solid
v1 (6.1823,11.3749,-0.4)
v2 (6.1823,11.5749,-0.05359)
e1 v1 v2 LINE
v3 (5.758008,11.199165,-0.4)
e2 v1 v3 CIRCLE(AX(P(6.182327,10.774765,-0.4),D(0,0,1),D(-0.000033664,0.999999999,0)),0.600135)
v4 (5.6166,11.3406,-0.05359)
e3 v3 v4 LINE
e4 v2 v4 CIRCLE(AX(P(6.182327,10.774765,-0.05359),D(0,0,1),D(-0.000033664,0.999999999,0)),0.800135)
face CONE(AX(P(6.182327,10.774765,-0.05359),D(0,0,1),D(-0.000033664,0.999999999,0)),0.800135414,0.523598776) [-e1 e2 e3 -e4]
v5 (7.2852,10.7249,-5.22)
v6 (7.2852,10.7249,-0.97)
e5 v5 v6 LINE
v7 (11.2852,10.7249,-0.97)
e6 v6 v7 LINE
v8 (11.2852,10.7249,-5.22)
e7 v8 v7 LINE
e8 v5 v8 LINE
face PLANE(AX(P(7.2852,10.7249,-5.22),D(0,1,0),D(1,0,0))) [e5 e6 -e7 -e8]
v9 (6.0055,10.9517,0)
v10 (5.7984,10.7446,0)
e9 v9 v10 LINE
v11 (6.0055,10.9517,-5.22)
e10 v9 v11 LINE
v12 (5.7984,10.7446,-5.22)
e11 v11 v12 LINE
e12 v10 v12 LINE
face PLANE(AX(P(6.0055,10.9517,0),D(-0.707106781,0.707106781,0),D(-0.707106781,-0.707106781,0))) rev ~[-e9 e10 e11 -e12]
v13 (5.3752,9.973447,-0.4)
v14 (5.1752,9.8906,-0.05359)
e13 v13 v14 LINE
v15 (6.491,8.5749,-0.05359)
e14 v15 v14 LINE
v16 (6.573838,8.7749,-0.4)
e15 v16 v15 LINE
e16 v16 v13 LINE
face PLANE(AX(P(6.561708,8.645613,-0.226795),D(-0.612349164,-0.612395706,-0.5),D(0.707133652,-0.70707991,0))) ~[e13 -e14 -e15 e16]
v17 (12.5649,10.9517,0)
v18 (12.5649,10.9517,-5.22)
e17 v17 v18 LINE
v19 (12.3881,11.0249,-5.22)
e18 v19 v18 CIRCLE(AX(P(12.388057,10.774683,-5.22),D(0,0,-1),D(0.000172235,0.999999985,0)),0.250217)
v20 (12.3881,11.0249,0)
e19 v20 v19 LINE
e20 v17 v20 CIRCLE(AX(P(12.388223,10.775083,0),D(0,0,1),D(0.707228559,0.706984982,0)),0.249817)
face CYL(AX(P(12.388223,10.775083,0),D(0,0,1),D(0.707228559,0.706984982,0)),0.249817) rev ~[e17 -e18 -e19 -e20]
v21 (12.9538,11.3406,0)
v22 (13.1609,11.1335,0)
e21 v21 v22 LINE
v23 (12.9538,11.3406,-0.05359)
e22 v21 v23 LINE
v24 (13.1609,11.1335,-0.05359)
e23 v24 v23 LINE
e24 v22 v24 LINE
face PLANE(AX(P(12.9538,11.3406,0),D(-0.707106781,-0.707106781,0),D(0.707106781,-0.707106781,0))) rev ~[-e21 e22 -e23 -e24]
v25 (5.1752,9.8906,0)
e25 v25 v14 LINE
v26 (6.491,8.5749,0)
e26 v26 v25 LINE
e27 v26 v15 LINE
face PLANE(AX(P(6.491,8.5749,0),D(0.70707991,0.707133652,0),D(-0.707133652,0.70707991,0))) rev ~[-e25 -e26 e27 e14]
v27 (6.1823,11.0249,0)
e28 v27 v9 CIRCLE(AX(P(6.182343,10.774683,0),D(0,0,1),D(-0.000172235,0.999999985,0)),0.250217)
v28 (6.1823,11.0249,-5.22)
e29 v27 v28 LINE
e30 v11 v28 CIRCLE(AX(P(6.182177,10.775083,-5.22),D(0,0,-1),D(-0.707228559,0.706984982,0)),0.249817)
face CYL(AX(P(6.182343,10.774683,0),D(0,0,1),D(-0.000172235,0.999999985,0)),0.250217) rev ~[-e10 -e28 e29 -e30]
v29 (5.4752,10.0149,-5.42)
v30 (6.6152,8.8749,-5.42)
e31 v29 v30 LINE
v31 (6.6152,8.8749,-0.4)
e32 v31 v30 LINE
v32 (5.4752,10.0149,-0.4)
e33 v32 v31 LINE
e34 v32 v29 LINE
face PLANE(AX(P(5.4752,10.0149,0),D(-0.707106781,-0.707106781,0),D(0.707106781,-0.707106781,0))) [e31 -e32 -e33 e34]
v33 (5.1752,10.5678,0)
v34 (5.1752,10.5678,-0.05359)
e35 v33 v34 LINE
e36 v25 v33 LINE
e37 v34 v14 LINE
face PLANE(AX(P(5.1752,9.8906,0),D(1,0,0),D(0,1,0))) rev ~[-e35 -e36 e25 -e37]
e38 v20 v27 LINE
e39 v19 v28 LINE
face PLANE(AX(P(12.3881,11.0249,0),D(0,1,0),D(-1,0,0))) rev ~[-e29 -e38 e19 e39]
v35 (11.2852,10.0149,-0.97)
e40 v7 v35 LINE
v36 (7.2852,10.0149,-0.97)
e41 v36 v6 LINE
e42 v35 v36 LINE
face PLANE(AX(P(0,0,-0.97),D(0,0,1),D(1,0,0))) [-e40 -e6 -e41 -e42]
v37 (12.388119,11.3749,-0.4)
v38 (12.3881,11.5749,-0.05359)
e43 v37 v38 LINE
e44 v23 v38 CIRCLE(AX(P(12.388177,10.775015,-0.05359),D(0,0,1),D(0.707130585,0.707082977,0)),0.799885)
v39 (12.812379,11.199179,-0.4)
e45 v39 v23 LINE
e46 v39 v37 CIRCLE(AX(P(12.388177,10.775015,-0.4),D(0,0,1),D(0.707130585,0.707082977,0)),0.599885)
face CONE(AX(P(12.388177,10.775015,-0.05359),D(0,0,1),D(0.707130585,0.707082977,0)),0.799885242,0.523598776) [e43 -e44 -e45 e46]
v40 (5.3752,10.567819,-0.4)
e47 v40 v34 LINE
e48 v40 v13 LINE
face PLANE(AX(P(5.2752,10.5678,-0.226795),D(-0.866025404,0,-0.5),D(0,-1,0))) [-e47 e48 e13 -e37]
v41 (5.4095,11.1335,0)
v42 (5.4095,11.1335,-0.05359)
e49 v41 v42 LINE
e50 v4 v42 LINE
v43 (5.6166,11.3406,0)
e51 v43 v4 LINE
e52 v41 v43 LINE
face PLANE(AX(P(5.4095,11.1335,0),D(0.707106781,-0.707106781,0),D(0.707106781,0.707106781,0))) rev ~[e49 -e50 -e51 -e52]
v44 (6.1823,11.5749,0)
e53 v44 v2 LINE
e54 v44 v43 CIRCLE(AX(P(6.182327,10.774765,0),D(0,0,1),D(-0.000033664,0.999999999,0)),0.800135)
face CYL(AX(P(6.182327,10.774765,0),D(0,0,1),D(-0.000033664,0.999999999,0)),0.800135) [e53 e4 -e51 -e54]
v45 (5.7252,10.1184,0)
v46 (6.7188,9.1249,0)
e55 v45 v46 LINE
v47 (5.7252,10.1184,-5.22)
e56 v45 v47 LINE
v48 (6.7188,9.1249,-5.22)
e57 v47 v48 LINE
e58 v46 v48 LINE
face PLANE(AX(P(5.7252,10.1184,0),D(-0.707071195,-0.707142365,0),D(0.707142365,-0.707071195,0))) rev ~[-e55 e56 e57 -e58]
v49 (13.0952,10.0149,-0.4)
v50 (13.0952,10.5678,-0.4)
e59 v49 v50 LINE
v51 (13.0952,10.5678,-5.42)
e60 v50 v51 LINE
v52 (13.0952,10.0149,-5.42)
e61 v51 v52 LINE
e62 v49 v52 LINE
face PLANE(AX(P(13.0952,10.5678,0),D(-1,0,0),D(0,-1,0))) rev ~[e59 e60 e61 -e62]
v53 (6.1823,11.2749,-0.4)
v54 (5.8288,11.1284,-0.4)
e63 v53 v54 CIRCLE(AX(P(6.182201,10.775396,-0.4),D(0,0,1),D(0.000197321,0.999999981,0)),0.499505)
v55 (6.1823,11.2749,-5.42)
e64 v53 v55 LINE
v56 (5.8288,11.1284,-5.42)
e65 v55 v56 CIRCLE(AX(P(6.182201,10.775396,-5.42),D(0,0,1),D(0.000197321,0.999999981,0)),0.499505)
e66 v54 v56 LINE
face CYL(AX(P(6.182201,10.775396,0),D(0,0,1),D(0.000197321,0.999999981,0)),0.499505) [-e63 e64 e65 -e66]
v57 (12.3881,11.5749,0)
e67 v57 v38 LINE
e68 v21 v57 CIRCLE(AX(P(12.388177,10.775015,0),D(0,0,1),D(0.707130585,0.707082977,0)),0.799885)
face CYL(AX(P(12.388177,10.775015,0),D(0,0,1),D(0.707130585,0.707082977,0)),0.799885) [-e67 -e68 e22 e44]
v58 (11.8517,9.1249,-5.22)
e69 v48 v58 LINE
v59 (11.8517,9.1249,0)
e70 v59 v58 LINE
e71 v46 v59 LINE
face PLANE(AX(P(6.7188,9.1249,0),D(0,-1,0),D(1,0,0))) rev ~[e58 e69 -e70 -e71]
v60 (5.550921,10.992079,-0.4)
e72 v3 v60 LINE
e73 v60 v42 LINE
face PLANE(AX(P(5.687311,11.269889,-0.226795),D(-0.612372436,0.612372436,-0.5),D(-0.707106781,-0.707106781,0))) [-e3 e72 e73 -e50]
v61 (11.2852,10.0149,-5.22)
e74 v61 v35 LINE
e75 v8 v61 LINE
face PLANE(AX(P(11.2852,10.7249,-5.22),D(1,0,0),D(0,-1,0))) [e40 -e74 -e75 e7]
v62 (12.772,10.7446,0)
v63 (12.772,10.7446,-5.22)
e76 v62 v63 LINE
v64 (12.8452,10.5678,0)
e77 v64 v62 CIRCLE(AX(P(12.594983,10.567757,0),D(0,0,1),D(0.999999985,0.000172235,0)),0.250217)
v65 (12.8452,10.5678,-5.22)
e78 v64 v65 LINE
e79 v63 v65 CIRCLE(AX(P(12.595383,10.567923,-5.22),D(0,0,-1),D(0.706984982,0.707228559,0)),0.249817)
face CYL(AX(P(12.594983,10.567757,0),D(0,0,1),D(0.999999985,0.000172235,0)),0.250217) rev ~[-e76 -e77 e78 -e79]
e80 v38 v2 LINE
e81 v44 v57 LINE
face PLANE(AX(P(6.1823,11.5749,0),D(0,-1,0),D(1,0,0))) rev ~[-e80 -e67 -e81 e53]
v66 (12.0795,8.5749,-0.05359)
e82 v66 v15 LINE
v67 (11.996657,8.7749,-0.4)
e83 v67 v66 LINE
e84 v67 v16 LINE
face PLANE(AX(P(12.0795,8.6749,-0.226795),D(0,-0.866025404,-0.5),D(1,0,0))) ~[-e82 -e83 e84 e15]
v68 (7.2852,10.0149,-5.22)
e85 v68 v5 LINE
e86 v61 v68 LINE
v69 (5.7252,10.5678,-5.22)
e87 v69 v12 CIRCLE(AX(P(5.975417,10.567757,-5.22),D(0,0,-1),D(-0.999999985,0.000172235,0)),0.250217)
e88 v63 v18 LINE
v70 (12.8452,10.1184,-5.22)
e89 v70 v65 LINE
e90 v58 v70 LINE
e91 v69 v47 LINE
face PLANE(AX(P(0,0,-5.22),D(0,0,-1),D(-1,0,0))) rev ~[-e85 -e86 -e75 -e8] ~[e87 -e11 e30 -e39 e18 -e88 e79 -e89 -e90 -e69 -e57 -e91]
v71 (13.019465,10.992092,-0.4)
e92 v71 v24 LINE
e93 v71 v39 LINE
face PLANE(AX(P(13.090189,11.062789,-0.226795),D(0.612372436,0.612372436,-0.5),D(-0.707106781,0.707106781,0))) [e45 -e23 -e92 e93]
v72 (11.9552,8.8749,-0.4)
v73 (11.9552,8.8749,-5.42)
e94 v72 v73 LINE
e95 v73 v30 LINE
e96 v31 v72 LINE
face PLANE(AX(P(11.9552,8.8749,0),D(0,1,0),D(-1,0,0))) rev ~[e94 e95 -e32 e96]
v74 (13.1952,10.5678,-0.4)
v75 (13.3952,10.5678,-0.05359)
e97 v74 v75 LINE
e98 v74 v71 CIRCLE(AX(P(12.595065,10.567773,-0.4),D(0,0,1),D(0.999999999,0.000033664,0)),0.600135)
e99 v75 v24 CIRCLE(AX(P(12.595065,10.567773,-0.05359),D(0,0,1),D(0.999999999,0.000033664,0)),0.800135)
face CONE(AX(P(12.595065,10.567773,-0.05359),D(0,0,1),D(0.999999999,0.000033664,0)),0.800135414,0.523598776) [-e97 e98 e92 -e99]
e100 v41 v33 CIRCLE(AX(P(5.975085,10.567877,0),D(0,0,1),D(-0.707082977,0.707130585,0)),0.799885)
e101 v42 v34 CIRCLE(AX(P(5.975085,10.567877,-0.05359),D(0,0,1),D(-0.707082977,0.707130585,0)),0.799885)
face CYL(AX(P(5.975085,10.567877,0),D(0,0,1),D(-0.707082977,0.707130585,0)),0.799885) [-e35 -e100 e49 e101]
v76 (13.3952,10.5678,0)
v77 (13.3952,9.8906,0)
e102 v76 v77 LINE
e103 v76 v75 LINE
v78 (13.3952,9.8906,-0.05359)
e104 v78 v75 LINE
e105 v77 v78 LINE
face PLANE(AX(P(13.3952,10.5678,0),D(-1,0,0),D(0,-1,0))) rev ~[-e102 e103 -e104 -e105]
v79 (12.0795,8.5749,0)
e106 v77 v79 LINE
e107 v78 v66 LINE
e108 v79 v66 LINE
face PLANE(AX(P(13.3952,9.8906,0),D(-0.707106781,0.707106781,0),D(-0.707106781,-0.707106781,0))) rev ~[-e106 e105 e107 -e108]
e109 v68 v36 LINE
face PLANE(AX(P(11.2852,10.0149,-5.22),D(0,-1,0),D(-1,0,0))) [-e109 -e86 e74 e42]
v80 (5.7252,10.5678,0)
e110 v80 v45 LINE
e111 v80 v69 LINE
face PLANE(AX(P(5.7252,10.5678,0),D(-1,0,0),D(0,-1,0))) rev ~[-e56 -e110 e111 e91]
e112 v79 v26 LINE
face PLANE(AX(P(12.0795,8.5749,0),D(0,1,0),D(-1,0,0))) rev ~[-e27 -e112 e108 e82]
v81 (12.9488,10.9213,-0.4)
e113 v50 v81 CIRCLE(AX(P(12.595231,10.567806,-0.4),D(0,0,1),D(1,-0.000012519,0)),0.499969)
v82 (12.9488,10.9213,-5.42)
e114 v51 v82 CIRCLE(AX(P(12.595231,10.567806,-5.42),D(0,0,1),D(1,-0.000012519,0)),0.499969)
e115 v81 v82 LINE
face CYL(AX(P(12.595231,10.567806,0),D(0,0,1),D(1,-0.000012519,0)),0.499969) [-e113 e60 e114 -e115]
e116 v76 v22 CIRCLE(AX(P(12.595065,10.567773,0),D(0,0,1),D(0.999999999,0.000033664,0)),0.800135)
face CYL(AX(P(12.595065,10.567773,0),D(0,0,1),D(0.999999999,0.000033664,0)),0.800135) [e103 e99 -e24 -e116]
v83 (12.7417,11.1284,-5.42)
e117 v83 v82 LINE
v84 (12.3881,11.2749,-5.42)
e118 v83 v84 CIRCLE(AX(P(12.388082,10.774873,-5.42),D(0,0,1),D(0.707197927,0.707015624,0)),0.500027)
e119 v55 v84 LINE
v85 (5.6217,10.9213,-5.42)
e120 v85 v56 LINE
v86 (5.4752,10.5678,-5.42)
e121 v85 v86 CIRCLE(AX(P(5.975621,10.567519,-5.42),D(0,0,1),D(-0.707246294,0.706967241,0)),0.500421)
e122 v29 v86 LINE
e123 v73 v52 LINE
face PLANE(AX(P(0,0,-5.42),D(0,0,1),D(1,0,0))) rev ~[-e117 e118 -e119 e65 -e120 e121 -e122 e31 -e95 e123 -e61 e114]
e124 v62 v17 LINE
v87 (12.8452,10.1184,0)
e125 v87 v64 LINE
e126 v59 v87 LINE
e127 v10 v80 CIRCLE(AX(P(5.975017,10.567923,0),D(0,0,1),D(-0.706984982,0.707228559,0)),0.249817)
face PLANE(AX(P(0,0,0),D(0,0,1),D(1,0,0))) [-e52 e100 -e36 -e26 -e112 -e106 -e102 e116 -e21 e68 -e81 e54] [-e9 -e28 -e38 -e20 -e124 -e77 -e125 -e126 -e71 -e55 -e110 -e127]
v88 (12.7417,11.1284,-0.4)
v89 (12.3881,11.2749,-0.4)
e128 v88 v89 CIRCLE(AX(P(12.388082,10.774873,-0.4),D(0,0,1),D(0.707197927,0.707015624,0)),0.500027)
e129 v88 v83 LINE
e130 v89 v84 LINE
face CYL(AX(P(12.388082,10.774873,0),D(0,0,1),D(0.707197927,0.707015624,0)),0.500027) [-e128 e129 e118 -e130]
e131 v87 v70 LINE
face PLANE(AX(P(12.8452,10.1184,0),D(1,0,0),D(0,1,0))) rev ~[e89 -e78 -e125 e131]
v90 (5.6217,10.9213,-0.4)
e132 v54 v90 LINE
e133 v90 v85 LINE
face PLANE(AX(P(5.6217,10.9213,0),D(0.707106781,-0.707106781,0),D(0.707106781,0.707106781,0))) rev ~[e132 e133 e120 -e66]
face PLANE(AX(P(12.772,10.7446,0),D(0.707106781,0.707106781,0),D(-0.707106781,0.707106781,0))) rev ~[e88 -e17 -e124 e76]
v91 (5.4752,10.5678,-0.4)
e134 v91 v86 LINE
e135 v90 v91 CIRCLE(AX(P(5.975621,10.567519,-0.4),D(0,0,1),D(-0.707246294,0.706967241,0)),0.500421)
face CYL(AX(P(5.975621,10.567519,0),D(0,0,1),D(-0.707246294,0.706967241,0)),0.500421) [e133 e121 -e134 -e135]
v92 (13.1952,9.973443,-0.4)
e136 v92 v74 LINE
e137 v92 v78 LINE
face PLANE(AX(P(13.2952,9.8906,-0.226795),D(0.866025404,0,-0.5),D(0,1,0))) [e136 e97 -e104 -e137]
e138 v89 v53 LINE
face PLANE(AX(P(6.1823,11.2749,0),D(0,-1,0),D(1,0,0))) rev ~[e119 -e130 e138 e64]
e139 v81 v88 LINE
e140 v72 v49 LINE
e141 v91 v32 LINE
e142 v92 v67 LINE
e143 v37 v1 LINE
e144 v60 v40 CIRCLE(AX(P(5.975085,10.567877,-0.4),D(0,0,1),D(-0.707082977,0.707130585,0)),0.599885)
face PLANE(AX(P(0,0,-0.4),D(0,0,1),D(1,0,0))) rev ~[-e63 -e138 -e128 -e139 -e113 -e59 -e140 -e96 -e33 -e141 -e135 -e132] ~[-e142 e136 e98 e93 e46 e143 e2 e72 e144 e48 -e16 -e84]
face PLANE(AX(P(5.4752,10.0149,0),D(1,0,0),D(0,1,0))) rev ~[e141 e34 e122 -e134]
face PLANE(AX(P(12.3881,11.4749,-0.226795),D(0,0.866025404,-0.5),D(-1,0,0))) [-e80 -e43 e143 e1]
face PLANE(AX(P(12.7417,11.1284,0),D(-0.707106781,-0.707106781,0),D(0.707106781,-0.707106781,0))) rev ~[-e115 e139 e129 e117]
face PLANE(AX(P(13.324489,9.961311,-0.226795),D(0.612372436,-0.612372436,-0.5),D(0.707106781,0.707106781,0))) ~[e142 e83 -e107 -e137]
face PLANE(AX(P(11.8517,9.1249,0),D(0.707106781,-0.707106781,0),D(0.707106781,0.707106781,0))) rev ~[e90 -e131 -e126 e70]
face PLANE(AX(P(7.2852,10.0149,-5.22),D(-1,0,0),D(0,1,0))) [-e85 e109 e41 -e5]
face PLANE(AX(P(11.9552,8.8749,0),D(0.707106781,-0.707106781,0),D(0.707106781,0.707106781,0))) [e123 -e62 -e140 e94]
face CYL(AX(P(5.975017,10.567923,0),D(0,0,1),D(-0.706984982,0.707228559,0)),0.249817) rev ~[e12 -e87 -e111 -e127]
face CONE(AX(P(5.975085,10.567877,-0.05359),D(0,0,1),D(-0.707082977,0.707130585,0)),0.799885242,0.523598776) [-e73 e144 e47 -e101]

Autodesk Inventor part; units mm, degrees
ref_plane "YZ Plane" through (0, 0, 0) normal (1, 0, 0) x (0, 1, 0)
ref_plane "XZ Plane" through (0, 0, 0) normal (0, 1, 0) x (-1, 0, 0)
sketch "Sketch1" plane through (0, 0, 0) normal (0, 0, 1) x (1, 0, 0)
  line L0 (6.1823, 11.2749) -> (12.3881, 11.2749)
  line L1 (13.0952, 10.5678) -> (13.0952, 10.0149)
  line L2 (11.9552, 8.8749) -> (6.6152, 8.8749)
  line L3 (5.4752, 10.0149) -> (5.4752, 10.5678)
  line L4 (5.4752, 10.0149) -> (6.6152, 8.8749)
  line L5 (11.9552, 8.8749) -> (13.0952, 10.0149)
  line L6 (5.6217, 10.9213) -> (5.8288, 11.1284)
  line L7 (12.7417, 11.1284) -> (12.9488, 10.9213)
  arc A0 (6.1823, 11.2749) -> (5.8288, 11.1284) centre (6.1823, 10.7749) ccw
  arc A1 (5.6217, 10.9213) -> (5.4752, 10.5678) centre (5.9752, 10.5678) ccw
  arc A2 (12.7417, 11.1284) -> (12.3881, 11.2749) centre (12.3881, 10.7749) ccw
  arc A3 (13.0952, 10.5678) -> (12.9488, 10.9213) centre (12.5952, 10.5678) ccw
  line L8 (12.3881, 11.0249) -> (6.1823, 11.0249)
  arc A4 (6.1823, 11.0249) -> (6.0055, 10.9517) centre (6.1823, 10.7749) ccw
  line L9 (6.0055, 10.9517) -> (5.7984, 10.7446)
  arc A5 (5.7984, 10.7446) -> (5.7252, 10.5678) centre (5.9752, 10.5678) ccw
  line L10 (5.7252, 10.5678) -> (5.7252, 10.1184)
  line L11 (5.7252, 10.1184) -> (6.7188, 9.1249)
  line L12 (6.7188, 9.1249) -> (11.8517, 9.1249)
  line L13 (11.8517, 9.1249) -> (12.8452, 10.1184)
  line L14 (12.8452, 10.1184) -> (12.8452, 10.5678)
  arc A6 (12.8452, 10.5678) -> (12.772, 10.7446) centre (12.5952, 10.5678) ccw
  line L15 (12.772, 10.7446) -> (12.5649, 10.9517)
  arc A7 (12.5649, 10.9517) -> (12.3881, 11.0249) centre (12.3881, 10.7749) ccw
  point P0 (0, 0)
  point P1 (13.0952, 8.8749)
  point P2 (5.4752, 8.8749)
  point P3 (5.4752, 11.2749)
  point P4 (13.0952, 11.2749)
  point P5 (5.4752, 10.7749)
  point P6 (5.9752, 11.2749)
  point P7 (12.5952, 11.2749)
  point P8 (13.0952, 10.7749)
  dimension "d0" = 7.62
  dimension "d1" = 2.4
  dimension "d3" = 1.14
  dimension "d4" = 1.14
  dimension "d5" = 1.14
  dimension "d6" = 1.14
  dimension "d7" = 0.5
  dimension "d8" = 0.5
  dimension "d9" = 0.5
  dimension "d10" = 0.5
  dimension "d11" = 0.5
  dimension "d12" = 0.25
extrude "Extrusion1" add sketch "Sketch1" against normal blind 5.42
sketch "Sketch2" plane through (0, 0, -5.42) normal (0, 0, -1) x (-1, 0, 0)
  line L0 (-12.8452, 10.1184) -> (-12.8452, 10.5678) projected
  arc A0 (-12.772, 10.7446) -> (-12.8452, 10.5678) centre (-12.5952, 10.5678) ccw projected
  line L1 (-12.772, 10.7446) -> (-12.5649, 10.9517) projected
  arc A1 (-12.3881, 11.0249) -> (-12.5649, 10.9517) centre (-12.3881, 10.7749) ccw projected
  line L2 (-12.3881, 11.0249) -> (-6.1823, 11.0249) projected
  line L3 (-11.8517, 9.1249) -> (-12.8452, 10.1184) projected
  line L4 (-6.7188, 9.1249) -> (-11.8517, 9.1249) projected
  line L5 (-5.7252, 10.1184) -> (-6.7188, 9.1249) projected
  line L6 (-5.7252, 10.5678) -> (-5.7252, 10.1184) projected
  arc A2 (-5.7252, 10.5678) -> (-5.7984, 10.7446) centre (-5.9752, 10.5678) ccw projected
  arc A3 (-6.0055, 10.9517) -> (-6.1823, 11.0249) centre (-6.1823, 10.7749) ccw projected
  line L7 (-6.0055, 10.9517) -> (-5.7984, 10.7446) projected
extrude "Extrusion2" add sketch "Sketch2" against normal blind 0.2
sketch "Sketch3" plane through (0, 0, -5.22) normal (0, 0, 1) x (1, 0, 0)
  line L0 (7.2852, 10.7249) -> (11.2852, 10.7249)
  line L1 (11.2852, 10.7249) -> (11.2852, 10.0149)
  line L2 (11.2852, 10.0149) -> (7.2852, 10.0149)
  line L3 (7.2852, 10.0149) -> (7.2852, 10.7249)
  line L4 (6.1823, 11.0249) -> (12.3881, 11.0249) projected
  line L5 (9.2852, 11.0249) -> (9.2852, 10.7249)
  point P0 (9.2852, 10.3699)
  point P1 (9.2852, 10.7249)
  dimension "d17" = 4
  dimension "d18" = 0.71
  dimension "d19" = 0.3
extrude "Extrusion3" add sketch "Sketch3" along normal blind 4.25
ref_plane "Work Plane1" through (9.2852, 10.0149, 0) normal (-1, 0, 0) x (0, 0, 1)
sketch "Sketch4" plane through (0, 0, 0) normal (0, 0, 1) x (1, 0, 0)
  arc A0 (5.6217, 10.9213) -> (5.4752, 10.5678) centre (5.9752, 10.5678) ccw
  line L0 (5.4752, 10.5678) -> (5.4752, 10.0149)
  line L1 (5.4752, 10.0149) -> (6.6152, 8.8749)
  line L2 (6.6152, 8.8749) -> (11.9552, 8.8749)
  line L3 (11.9552, 8.8749) -> (13.0952, 10.0149)
  line L4 (13.0952, 10.0149) -> (13.0952, 10.5678)
  arc A1 (13.0952, 10.5678) -> (12.9488, 10.9213) centre (12.5952, 10.5678) ccw
  line L5 (12.9488, 10.9213) -> (12.7417, 11.1284)
  arc A2 (12.7417, 11.1284) -> (12.3881, 11.2749) centre (12.3881, 10.7749) ccw
  line L6 (12.3881, 11.2749) -> (6.1823, 11.2749)
  arc A3 (6.1823, 11.2749) -> (5.8288, 11.1284) centre (6.1823, 10.7749) ccw
  line L7 (5.8288, 11.1284) -> (5.6217, 10.9213)
  line L8 (6.1823, 11.5749) -> (12.3881, 11.5749)
  arc A4 (12.9538, 11.3406) -> (12.3881, 11.5749) centre (12.3881, 10.7749) ccw
  line L9 (12.9538, 11.3406) -> (13.1609, 11.1335)
  arc A5 (13.3952, 10.5678) -> (13.1609, 11.1335) centre (12.5952, 10.5678) ccw
  line L10 (13.3952, 10.5678) -> (13.3952, 9.8906)
  line L11 (13.3952, 9.8906) -> (12.0795, 8.5749)
  line L12 (12.0795, 8.5749) -> (6.491, 8.5749)
  line L13 (6.491, 8.5749) -> (5.1752, 9.8906)
  line L14 (5.1752, 9.8906) -> (5.1752, 10.5678)
  arc A6 (5.4095, 11.1335) -> (5.1752, 10.5678) centre (5.9752, 10.5678) ccw
  line L15 (5.4095, 11.1335) -> (5.6166, 11.3406)
  arc A7 (6.1823, 11.5749) -> (5.6166, 11.3406) centre (6.1823, 10.7749) ccw
  dimension "d22" = 0.3
extrude "Extrusion4" add sketch "Sketch4" against normal blind 0.4
chamfer "Chamfer1" distance 0.2 angle 60 12 edges at (12.6943, 11.514, -0.4) (13.0573, 11.237, -0.4) (13.3343, 10.8739, -0.4) (13.3952, 10.2292, -0.4) (9.2852, 11.5749, -0.4) (5.8762, 11.514, -0.4) (5.5131, 11.237, -0.4) (5.2361, 10.8739, -0.4) (5.1752, 10.2292, -0.4) (12.7373, 9.2328, -0.4) (5.8331, 9.2328, -0.4) (9.2852, 8.5749, -0.4) measured on face at (10.3195, 11.4749, -0.4)
equation "\"d4\" = d3"
equation "\"d5\" = d3"
equation "\"d6\" = d5"
equation "\"d8\" = d7"
equation "\"d9\" = d7"
equation "\"d10\" = d9"
properties part number "USB Port"
